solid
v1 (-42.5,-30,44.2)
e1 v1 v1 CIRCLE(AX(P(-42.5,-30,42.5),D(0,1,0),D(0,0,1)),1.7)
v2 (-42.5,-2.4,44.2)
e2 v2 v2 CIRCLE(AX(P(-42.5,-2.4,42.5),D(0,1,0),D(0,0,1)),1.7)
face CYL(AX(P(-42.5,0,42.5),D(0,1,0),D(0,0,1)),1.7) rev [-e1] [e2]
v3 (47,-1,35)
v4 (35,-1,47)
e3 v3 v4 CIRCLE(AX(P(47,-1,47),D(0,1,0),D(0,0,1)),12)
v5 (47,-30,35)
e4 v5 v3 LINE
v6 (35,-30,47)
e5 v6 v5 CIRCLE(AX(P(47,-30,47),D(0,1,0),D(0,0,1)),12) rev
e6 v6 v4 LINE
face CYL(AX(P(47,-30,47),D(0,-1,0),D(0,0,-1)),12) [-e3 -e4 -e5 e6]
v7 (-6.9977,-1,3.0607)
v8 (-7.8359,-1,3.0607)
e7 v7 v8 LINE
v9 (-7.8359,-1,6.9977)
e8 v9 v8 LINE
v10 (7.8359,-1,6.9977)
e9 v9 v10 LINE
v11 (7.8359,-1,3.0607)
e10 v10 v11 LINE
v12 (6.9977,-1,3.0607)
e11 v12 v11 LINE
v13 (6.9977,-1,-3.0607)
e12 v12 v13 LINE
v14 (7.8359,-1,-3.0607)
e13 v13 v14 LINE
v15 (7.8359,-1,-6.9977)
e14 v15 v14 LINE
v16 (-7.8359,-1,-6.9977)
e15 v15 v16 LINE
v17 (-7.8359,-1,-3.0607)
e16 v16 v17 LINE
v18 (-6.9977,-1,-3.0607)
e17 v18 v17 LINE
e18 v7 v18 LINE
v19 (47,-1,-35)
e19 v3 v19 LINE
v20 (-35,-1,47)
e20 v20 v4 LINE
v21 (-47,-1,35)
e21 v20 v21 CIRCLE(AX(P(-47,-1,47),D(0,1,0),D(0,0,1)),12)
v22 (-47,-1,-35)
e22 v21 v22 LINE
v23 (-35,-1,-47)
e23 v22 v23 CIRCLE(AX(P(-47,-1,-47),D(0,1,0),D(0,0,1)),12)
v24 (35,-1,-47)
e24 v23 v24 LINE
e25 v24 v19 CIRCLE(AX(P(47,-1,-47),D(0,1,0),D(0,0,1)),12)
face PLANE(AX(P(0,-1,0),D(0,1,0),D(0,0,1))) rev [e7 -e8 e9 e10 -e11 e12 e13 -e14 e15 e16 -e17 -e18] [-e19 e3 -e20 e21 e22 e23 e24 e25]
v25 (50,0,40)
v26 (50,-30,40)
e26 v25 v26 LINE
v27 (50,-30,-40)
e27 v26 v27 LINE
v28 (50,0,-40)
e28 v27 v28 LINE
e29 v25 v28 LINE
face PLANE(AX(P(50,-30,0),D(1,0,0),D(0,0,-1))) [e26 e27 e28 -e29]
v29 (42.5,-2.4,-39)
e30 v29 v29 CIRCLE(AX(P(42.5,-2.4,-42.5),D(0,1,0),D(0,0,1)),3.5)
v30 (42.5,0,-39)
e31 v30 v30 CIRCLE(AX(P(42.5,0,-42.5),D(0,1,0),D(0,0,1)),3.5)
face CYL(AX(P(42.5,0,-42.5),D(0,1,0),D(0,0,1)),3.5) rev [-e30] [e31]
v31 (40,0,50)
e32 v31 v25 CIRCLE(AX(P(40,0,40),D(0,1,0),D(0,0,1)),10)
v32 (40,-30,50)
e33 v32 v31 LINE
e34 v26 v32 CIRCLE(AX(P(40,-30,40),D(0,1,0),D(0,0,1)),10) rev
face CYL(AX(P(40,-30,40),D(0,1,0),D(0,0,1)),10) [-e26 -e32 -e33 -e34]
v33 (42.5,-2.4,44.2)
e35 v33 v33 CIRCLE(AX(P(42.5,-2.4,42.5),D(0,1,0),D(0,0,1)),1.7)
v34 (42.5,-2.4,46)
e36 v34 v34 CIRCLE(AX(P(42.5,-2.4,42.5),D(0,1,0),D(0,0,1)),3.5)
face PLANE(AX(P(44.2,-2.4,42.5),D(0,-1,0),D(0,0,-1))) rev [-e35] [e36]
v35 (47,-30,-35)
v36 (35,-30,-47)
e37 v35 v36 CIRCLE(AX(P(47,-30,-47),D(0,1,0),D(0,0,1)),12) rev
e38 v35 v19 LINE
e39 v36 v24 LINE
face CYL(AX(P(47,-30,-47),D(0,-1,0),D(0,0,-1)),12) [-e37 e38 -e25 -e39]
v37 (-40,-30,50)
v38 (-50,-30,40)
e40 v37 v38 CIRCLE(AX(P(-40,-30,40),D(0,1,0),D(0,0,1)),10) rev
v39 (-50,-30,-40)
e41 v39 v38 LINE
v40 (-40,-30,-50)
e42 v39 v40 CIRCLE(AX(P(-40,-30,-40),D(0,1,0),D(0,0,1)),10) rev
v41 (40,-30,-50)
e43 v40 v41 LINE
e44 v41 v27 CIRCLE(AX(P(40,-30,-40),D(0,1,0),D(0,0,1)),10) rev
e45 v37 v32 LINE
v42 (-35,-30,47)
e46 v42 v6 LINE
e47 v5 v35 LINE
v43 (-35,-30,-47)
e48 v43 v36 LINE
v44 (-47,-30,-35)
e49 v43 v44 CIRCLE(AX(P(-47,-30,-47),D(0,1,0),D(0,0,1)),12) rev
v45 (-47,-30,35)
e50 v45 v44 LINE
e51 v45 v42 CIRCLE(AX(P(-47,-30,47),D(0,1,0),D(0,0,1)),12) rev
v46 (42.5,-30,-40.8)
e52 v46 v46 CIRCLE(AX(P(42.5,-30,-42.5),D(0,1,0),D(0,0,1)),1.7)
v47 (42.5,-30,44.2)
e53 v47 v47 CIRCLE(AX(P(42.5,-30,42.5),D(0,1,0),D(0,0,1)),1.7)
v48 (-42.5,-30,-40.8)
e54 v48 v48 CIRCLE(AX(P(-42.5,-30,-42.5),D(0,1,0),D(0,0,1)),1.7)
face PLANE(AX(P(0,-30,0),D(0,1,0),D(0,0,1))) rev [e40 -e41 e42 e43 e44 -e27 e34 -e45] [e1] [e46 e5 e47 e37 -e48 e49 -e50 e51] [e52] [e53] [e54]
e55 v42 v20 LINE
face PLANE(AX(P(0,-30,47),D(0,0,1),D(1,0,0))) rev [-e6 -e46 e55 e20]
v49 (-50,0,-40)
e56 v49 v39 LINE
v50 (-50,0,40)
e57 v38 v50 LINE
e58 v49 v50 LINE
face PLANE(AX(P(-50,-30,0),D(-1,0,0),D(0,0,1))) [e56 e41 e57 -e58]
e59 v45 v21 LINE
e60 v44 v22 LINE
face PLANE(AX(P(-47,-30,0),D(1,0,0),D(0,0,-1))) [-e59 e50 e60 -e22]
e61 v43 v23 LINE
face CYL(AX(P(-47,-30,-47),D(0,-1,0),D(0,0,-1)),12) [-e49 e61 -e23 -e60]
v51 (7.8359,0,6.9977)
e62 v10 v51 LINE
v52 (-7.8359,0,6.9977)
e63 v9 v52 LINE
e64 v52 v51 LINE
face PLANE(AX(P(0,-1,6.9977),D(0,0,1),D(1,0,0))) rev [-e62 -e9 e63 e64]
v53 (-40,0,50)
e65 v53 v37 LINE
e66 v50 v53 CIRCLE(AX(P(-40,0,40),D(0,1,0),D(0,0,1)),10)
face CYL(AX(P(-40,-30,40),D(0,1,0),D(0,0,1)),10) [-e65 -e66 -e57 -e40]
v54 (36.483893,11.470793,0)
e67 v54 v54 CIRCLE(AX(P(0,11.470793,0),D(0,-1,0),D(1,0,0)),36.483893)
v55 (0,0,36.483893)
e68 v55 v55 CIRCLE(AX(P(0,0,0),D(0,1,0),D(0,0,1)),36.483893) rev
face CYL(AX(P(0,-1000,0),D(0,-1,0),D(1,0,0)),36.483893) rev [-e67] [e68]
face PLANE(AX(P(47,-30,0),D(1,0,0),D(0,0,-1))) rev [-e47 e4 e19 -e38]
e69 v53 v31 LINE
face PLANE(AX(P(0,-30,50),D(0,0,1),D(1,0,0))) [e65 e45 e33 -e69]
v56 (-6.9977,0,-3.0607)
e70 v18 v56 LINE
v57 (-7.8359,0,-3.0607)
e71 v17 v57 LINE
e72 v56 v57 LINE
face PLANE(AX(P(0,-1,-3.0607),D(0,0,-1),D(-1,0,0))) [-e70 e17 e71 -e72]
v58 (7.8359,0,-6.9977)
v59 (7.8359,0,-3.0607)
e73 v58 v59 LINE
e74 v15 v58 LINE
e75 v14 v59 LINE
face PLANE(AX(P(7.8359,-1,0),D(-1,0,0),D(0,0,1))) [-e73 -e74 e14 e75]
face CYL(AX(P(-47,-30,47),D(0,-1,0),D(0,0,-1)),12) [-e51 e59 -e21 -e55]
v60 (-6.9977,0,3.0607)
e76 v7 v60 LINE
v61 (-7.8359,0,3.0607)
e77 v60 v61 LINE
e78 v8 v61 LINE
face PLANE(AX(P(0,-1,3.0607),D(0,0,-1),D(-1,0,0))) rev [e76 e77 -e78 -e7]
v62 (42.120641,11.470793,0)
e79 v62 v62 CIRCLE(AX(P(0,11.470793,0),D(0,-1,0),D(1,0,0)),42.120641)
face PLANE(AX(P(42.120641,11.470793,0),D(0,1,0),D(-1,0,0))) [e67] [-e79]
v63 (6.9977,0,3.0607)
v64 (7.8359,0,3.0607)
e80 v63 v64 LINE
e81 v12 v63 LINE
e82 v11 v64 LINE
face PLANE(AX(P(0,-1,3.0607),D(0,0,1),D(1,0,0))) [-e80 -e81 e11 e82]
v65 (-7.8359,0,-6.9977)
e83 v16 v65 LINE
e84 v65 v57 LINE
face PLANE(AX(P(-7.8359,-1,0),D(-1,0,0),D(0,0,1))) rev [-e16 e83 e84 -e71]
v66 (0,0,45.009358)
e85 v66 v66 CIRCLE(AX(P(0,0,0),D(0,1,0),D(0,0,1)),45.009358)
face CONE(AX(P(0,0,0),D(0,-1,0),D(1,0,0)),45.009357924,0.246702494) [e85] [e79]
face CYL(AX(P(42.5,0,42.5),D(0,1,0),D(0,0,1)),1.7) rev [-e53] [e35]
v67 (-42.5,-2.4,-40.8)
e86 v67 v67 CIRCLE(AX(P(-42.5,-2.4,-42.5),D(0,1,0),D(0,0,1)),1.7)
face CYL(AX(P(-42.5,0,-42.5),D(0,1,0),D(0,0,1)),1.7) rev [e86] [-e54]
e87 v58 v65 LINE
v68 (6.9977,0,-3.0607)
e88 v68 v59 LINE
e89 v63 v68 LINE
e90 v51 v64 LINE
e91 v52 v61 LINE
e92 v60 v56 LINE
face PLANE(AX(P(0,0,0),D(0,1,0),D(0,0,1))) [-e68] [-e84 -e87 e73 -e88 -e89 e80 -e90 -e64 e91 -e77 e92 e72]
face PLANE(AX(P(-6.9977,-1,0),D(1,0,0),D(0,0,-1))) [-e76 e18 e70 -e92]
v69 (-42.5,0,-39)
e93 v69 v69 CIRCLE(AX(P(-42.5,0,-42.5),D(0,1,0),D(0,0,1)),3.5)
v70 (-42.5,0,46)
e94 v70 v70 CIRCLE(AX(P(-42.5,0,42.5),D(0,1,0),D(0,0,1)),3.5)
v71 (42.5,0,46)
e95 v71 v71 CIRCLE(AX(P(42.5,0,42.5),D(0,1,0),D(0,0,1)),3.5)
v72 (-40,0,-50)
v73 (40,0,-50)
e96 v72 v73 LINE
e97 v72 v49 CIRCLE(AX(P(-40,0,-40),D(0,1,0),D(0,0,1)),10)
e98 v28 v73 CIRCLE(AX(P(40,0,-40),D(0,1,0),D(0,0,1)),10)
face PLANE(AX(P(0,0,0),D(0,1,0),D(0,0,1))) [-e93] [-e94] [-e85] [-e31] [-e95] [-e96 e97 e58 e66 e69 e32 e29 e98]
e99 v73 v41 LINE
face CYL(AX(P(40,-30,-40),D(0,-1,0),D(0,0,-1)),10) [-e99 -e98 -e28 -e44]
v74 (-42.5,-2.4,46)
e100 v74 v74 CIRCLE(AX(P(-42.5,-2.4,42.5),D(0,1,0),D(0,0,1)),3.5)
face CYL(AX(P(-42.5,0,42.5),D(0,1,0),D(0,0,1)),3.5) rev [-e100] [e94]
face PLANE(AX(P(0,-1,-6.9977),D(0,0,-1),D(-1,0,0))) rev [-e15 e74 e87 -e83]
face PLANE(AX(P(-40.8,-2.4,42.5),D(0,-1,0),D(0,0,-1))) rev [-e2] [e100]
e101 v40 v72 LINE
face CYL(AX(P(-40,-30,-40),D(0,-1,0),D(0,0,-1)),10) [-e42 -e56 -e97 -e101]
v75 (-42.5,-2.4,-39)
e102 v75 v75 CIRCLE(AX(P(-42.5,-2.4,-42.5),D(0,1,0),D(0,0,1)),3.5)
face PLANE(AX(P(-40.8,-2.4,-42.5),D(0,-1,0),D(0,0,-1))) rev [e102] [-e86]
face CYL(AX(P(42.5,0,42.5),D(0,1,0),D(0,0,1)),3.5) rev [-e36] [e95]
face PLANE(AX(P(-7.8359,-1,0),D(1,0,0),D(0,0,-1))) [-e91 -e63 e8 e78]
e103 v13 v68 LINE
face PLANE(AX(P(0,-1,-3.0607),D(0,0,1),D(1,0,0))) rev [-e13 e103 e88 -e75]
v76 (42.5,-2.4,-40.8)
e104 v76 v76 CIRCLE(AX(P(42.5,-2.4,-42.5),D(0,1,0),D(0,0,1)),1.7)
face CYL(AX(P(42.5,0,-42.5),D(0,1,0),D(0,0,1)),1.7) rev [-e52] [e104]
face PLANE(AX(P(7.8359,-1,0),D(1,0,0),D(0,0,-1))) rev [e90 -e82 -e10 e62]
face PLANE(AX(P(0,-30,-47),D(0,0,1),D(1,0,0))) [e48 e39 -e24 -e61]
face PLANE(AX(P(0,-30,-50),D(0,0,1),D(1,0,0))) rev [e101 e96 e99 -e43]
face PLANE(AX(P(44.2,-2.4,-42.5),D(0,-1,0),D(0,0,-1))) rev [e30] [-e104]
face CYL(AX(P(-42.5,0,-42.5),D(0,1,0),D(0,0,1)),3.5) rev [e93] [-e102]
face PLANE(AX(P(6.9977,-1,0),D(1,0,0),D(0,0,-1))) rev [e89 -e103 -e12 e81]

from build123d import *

# Parameters (mm, degrees)
SKIZZE1_R                                            = 1.5
AUFSATZ_LINEAR_AUSTRAGEN1_DEPTH                      = 30
AUFSATZ_LINEAR_AUSTRAGEN2_DEPTH                      = 1
VERRUNDUNG1_R                                        = 10
VERRUNDUNG2_R                                        = 12
STIRNSENKUNG_F_R_M3_FLACHKOPFSCHRAUBE_MI_D           = 3.4
STIRNSENKUNG_F_R_M3_FLACHKOPFSCHRAUBE_MI_CBORE_D     = 7
STIRNSENKUNG_F_R_M3_FLACHKOPFSCHRAUBE_MI_CBORE_DEPTH = 2.4


with BuildPart() as part:
    # Skizze1 → Aufsatz-Linear austragen1 (new body)
    with BuildSketch(Plane(origin=(0, 0, 0), x_dir=(1, 0, 0), z_dir=(0, 1, 0))):
        Polygon((-50, 50), (50, 50), (50, -50), (-50, -50), (-50, 35), align=None)
        with Locations(Location((42.5, 42.5, 0), (0, 0, 270))):
            Circle(SKIZZE1_R, mode=Mode.SUBTRACT)
        with Locations(Location((-42.5, 42.5, 0), (0, 0, 270))):
            Circle(SKIZZE1_R, mode=Mode.SUBTRACT)
        with Locations(Location((42.5, -42.5, 0), (0, 0, 270))):
            Circle(SKIZZE1_R, mode=Mode.SUBTRACT)
        with Locations(Location((-42.5, -42.5, 0), (0, 0, 270))):
            Circle(SKIZZE1_R, mode=Mode.SUBTRACT)
        Polygon((-47, -35), (-35, -35), (-35, -47), (35, -47), (35, -35), (47, -35), (47, 35), (35, 35), (35, 47), (-35, 47), (-35, 35), (-47, 35), align=None, mode=Mode.SUBTRACT)
    extrude(amount=-AUFSATZ_LINEAR_AUSTRAGEN1_DEPTH)

    # Skizze1<3> → Aufsatz-Linear austragen2 (add)
    with BuildSketch(Plane(origin=(0, 0, 0), x_dir=(1, 0, 0), z_dir=(0, 1, 0))):
        Polygon((35, 47), (-35, 47), (-35, 35), (-47, 35), (-47, -35), (-35, -35), (-35, -47), (35, -47), (35, -35), (47, -35), (47, 35), (35, 35), align=None)
        Polygon((-7.8359, -3.0607), (-6.9977, -3.0607), (-6.9977, 3.0607), (-7.8359, 3.0607), (-7.8359, 6.9977), (-6.9977, 6.9977), (6.9977, 6.9977), (7.8359, 6.9977), (7.8359, 3.0607), (6.9977, 3.0607), (6.9977, -3.0607), (7.8359, -3.0607), (7.8359, -6.9977), (6.9977, -6.9977), (-6.9977, -6.9977), (-7.8359, -6.9977), align=None, mode=Mode.SUBTRACT)
    extrude(amount=-AUFSATZ_LINEAR_AUSTRAGEN2_DEPTH)

    # Verrundung1
    verrundung1_edges = [part.edges().sort_by_distance(p)[0] for p in [
        (50, -15, -50),
        (50, -15, 50),
        (-50, -15, 50),
        (-50, -15, -50),
    ]]
    fillet(verrundung1_edges, radius=VERRUNDUNG1_R)

    # Verrundung2
    verrundung2_edges = [part.edges().sort_by_distance(p)[0] for p in [
        (35, -15.5, 35),
        (-35, -15.5, 35),
        (35, -15.5, -35),
        (-35, -15.5, -35),
    ]]
    fillet(verrundung2_edges, radius=VERRUNDUNG2_R - 0.0001)  # a hair under: the kernel refuses the full size

    # Stirnsenkung für M3 Flachkopfschraube mit Schlitz1 (through all)
    with Locations(Plane(origin=(0, 0, 0), x_dir=(1, 0, 0), z_dir=(0, 1, 0))):
        with Locations((-42.5, -42.5), (-42.5, 42.5), (42.5, -42.5), (42.5, 42.5)):
            CounterBoreHole(STIRNSENKUNG_F_R_M3_FLACHKOPFSCHRAUBE_MI_D / 2, STIRNSENKUNG_F_R_M3_FLACHKOPFSCHRAUBE_MI_CBORE_D / 2, STIRNSENKUNG_F_R_M3_FLACHKOPFSCHRAUBE_MI_CBORE_DEPTH)

    # Skizze9 → Rotation1 (revolve)
    with BuildSketch(Plane.XY):
        Polygon((45.009357924, 0), (42.120640981, 11.470793218), (36.483893338, 11.470793218), (36.483893338, 0), align=None)
    revolve(axis=Axis((0, -1000, 0), (0, 1, 0)))


solid = part.part
